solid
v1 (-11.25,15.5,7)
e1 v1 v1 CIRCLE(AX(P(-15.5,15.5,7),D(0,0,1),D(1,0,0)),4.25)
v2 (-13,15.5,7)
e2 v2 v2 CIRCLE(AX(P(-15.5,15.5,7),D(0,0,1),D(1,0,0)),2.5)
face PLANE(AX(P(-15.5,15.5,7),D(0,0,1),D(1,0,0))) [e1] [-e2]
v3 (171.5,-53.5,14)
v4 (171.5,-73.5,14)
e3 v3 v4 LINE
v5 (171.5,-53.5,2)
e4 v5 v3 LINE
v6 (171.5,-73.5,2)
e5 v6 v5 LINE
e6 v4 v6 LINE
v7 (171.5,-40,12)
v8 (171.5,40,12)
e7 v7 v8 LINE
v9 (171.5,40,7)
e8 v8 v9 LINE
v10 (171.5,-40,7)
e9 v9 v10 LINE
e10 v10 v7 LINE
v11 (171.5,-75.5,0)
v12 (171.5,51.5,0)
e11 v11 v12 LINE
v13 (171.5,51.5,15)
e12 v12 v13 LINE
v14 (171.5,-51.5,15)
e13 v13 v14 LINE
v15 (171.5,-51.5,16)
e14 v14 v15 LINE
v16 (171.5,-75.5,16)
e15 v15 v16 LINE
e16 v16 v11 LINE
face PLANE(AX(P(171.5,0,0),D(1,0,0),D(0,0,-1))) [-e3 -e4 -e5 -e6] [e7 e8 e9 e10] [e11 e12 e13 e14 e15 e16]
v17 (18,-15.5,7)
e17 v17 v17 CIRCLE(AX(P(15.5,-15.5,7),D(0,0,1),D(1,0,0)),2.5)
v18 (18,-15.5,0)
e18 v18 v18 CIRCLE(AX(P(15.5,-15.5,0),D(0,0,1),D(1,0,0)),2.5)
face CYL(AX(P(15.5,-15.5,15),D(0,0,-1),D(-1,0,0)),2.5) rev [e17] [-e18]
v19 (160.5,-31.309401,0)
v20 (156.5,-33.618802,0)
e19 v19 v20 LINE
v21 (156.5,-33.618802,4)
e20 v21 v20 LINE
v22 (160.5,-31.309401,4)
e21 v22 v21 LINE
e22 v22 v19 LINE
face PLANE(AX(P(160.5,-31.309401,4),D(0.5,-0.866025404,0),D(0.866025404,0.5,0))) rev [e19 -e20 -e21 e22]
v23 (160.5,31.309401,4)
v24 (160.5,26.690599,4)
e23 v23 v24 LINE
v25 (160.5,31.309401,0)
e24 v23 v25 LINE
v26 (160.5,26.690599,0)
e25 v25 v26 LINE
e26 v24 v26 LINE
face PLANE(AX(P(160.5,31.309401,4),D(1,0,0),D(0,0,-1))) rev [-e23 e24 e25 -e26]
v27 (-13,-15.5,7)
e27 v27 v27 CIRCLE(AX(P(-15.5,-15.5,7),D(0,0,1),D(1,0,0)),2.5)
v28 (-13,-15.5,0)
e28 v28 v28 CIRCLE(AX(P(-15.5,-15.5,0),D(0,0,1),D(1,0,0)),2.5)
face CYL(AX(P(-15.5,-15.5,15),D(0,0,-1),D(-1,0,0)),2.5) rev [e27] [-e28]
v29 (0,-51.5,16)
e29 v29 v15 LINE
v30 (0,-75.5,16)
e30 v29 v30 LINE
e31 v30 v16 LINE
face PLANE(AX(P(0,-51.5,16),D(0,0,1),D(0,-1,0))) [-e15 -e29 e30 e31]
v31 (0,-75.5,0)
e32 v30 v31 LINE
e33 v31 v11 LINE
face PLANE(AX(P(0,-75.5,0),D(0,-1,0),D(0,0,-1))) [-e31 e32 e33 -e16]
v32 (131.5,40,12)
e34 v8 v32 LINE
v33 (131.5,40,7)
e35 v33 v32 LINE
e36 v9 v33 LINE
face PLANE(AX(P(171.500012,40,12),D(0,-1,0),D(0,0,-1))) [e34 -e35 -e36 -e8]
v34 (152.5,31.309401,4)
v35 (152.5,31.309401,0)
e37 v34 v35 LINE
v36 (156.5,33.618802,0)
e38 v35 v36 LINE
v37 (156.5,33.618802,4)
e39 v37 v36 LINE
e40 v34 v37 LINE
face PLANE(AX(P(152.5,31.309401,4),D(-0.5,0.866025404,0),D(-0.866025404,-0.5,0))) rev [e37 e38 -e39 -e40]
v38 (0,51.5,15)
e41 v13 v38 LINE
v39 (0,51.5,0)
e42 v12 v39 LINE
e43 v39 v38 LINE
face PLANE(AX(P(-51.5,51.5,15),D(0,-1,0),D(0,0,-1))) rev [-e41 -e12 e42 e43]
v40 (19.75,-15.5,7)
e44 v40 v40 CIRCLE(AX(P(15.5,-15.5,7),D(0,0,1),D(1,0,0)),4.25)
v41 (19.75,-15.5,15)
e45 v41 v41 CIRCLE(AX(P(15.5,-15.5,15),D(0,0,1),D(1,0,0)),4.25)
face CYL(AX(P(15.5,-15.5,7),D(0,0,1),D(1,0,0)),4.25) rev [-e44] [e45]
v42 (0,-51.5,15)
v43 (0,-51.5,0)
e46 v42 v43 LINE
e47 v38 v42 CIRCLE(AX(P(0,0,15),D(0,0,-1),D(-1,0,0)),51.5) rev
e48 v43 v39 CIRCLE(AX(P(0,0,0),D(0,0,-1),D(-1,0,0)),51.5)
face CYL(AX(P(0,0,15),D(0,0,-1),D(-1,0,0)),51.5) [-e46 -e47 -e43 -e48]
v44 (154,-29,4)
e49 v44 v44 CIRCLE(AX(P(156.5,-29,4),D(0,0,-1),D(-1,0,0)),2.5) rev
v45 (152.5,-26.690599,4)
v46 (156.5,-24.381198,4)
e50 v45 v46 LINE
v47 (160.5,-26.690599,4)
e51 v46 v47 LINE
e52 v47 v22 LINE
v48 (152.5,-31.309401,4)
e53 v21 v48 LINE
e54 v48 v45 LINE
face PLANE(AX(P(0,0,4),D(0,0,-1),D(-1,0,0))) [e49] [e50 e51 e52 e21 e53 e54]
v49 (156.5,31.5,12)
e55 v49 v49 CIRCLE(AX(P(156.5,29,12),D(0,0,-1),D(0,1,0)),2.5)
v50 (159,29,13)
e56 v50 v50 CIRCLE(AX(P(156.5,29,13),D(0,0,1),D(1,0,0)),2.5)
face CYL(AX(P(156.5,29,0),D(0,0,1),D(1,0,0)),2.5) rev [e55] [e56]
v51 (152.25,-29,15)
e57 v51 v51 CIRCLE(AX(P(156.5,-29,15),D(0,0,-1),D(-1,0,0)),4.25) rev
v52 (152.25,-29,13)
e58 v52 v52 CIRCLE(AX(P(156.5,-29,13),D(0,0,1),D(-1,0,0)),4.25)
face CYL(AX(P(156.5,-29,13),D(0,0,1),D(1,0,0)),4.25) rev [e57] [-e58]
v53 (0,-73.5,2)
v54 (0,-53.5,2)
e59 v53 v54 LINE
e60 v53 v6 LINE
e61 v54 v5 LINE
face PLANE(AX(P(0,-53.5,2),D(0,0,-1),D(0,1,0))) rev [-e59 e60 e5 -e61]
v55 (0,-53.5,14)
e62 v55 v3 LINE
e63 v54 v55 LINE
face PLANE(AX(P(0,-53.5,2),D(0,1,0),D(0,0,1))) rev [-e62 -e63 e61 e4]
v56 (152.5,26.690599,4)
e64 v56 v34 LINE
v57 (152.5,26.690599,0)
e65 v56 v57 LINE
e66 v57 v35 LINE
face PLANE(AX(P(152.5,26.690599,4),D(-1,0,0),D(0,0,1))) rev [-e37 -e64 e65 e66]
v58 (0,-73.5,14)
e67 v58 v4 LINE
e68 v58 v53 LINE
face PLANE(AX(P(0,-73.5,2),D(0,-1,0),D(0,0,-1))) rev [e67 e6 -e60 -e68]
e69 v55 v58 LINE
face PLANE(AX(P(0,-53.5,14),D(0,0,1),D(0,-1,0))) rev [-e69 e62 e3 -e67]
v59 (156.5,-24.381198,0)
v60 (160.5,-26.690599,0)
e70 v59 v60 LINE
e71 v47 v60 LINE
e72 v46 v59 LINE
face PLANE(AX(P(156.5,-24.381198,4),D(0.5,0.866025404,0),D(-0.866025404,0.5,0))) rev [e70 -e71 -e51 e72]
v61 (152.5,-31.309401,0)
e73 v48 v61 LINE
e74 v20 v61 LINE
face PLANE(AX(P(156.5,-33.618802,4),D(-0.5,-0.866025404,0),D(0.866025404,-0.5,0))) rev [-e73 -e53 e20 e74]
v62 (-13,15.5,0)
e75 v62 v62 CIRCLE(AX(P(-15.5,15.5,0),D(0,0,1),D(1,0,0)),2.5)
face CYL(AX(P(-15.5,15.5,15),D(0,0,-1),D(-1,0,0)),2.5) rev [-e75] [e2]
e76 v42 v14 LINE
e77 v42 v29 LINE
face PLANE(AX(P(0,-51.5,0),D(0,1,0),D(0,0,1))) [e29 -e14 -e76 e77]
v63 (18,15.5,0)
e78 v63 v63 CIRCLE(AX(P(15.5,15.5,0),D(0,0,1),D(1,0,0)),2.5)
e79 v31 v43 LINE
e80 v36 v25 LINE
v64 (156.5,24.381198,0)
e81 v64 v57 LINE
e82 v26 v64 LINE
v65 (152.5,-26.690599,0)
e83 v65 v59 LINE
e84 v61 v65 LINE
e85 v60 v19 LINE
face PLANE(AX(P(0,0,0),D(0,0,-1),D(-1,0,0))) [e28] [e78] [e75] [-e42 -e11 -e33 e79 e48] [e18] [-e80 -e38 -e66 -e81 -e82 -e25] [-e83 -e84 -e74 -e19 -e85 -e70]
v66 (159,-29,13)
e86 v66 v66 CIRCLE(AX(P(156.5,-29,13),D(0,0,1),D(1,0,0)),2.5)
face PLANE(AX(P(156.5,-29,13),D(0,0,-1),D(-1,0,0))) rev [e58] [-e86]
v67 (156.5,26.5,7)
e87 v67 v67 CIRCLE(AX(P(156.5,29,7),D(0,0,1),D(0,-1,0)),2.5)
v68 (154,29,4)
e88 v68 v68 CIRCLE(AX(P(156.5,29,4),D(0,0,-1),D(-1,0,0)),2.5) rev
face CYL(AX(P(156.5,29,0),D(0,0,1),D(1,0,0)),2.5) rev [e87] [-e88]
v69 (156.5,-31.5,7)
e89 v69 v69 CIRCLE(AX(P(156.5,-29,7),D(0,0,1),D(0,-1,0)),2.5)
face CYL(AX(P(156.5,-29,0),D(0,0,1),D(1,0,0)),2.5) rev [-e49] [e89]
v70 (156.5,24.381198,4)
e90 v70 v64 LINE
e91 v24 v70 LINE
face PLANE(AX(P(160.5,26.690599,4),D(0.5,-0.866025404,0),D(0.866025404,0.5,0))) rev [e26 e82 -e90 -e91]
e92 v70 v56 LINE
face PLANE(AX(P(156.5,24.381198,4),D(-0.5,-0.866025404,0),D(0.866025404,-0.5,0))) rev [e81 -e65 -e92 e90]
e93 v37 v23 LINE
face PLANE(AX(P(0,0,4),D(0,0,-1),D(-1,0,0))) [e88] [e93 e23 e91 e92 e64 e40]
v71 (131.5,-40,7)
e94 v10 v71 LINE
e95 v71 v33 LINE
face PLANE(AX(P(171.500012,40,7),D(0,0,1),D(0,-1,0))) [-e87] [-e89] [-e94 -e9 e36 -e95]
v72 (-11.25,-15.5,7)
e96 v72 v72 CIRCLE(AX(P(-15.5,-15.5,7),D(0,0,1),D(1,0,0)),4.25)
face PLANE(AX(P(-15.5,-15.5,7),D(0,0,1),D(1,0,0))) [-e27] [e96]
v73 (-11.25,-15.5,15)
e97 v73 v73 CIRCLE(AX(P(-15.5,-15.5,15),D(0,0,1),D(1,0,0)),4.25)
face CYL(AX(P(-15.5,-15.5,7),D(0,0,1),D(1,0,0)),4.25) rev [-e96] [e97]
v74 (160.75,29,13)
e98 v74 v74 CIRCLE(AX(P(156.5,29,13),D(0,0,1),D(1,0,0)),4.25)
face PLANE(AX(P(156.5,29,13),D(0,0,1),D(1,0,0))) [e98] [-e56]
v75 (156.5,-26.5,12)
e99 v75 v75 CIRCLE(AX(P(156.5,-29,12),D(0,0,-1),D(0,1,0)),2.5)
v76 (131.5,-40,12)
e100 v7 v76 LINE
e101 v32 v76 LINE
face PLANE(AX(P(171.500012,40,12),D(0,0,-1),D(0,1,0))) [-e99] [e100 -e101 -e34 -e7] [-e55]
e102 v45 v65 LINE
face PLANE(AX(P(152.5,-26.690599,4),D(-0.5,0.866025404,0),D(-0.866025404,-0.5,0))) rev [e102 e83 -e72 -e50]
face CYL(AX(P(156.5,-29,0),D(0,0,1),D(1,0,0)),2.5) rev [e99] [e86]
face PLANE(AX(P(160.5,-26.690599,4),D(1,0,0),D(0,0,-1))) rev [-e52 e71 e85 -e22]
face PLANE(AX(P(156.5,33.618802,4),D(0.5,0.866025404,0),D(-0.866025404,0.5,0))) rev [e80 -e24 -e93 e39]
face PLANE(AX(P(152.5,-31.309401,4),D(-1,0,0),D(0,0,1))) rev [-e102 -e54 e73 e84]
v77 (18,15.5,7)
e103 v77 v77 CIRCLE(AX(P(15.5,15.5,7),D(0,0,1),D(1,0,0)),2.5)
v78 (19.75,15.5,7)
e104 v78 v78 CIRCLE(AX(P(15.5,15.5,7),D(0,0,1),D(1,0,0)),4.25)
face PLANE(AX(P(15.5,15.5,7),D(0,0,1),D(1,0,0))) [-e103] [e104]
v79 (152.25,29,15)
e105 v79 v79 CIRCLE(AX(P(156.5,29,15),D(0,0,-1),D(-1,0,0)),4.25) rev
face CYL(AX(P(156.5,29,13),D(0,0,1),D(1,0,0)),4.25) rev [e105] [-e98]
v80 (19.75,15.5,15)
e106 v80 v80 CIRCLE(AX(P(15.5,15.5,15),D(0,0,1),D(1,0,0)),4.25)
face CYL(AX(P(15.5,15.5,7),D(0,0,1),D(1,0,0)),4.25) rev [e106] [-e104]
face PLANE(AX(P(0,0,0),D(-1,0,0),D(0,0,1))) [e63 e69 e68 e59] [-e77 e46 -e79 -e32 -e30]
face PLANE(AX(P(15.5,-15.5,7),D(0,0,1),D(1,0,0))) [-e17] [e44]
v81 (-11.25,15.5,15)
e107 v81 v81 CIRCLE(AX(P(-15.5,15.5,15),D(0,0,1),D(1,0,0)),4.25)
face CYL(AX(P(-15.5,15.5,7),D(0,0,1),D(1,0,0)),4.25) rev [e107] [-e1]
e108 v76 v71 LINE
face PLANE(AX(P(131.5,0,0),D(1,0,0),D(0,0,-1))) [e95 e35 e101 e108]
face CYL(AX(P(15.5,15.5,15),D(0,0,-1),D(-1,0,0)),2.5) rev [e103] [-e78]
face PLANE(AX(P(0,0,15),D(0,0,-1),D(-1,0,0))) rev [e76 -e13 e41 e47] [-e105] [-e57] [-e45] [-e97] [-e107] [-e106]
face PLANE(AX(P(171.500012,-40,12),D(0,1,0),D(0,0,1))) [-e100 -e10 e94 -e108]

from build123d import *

# Parameters (mm, degrees)
CROQUIS1_W                        = 103
CROQUIS1_H                        = 103
CROQUIS1_R                        = 2.5
SALIENTE_EXTRUIR1_DEPTH           = 15
REDONDEO2_R                       = 51.5
CROQUIS2_W                        = 15
CROQUIS2_H                        = 103
SALIENTE_EXTRUIR2_DEPTH           = 120
CROQUIS3_R                        = 4.25
CORTAR_EXTRUIR1_DEPTH             = 8
SALIENTE_EXTRUIR3_START           = -223
SALIENTE_EXTRUIR3_DEPTH           = 223
CORTAR_EXTRUIR2_DEPTH             = 181.53669987
CORTAR_EXTRUIR2_DEPTH_BACK        = 181.53669987
REDONDEO3_START                   = -23.965772234
REDONDEO3_DEPTH                   = 195.465772234
REDONDEO3_START_2                 = -45.024993159
REDONDEO3_2_DEPTH                 = 21.059220925
REDONDEO3_START_3                 = 15
REDONDEO3_3_DEPTH                 = 9
REDONDEO4_R                       = 10
CORTAR_EXTRUIR3_REACH             = 182.537
CROQUIS6_R                        = 4.25
CORTAR_EXTRUIR3_DIRECTION_2_DEPTH = 181.536699978
CORTAR_EXTRUIR4_DEPTH             = 231.022281636
CORTAR_EXTRUIR4_DEPTH_BACK        = 40
CROQUIS7_W                        = 5
CROQUIS7_H                        = 80
CROQUIS10_R                       = 4.25
CORTAR_EXTRUIR5_DEPTH             = 10
CROQUIS11_R                       = 2.5
CORTAR_EXTRUIR6_DEPTH             = 180.536904387
CROQUIS12_W                       = 16
CROQUIS12_H                       = 24
CROQUIS12_W_2                     = 12
CROQUIS12_H_2                     = 20
SALIENTE_EXTRUIR4_DEPTH           = 171.5
CORTAR_EXTRUIR7_DEPTH             = 4
CROQUIS14_W                       = 242.583484446
CROQUIS14_H                       = 103.867159029
CORTAR_EXTRUIR8_DEPTH             = 8


with BuildPart() as part:
    # Croquis1 → Saliente-Extruir1 (new body)
    with BuildSketch(Plane.XY):
        Rectangle(CROQUIS1_W, CROQUIS1_H)
        with Locations((15.5, 15.5)):
            Circle(CROQUIS1_R, mode=Mode.SUBTRACT)
        with Locations((-15.5, 15.5)):
            Circle(CROQUIS1_R, mode=Mode.SUBTRACT)
        with Locations((-15.5, -15.5)):
            Circle(CROQUIS1_R, mode=Mode.SUBTRACT)
        with Locations((15.5, -15.5)):
            Circle(CROQUIS1_R, mode=Mode.SUBTRACT)
    extrude(amount=SALIENTE_EXTRUIR1_DEPTH)

    # Redondeo2
    redondeo2_edges = [part.edges().sort_by_distance(p)[0] for p in [
        (-51.5, -51.5, 7.5),
        (-51.5, 51.5, 7.5),
    ]]
    fillet(redondeo2_edges, radius=REDONDEO2_R - 0.0001)  # a hair under: the kernel refuses the full size

    # Croquis2 → Saliente-Extruir2 (add)
    with BuildSketch(Plane(origin=(51.5, 0, 0), x_dir=(0, 0, -1), z_dir=(1, 0, 0))):
        with Locations((-7.5, 0)):
            Rectangle(CROQUIS2_W, CROQUIS2_H)
    extrude(amount=SALIENTE_EXTRUIR2_DEPTH)

    # Croquis3 → Cortar-Extruir1 (cut)
    with BuildSketch(Plane.XY.offset(15)):
        with Locations((-15.5, 15.5)):
            Circle(CROQUIS3_R)
        with Locations((15.5, 15.5)):
            Circle(CROQUIS3_R)
        with Locations((15.5, -15.5)):
            Circle(CROQUIS3_R)
        with Locations((-15.5, -15.5)):
            Circle(CROQUIS3_R)
    extrude(amount=-CORTAR_EXTRUIR1_DEPTH, mode=Mode.SUBTRACT)

    # Croquis4 → Saliente-Extruir3 (add)
    with BuildSketch(Plane(origin=(171.5, 0, 0), x_dir=(0, 0, -1), z_dir=(1, 0, 0)).offset(SALIENTE_EXTRUIR3_START)):
        Polygon((-15, -19), (-15, -25), (-23, -25), (-23, 25), (-15, 25), (-15, 19), (-19, 19), (-19, -19), align=None)
    extrude(amount=SALIENTE_EXTRUIR3_DEPTH)

    # Croquis5 → Cortar-Extruir2 (cut, two sides: drawn at the far end of the back side and taken through both)
    with BuildSketch(Plane(origin=(0, 0, 0), x_dir=(-1, 0, 0), z_dir=(0, 0, -1)).offset(-CORTAR_EXTRUIR2_DEPTH_BACK)):
        with BuildLine():
            Line((40.930864284, 31.255629077), (61.422564692, 30.315306135))
            Line((61.422564692, 30.315306135), (63.075048064, -35.056936027))
            Line((63.075048064, -35.056936027), (38.432028807, -34.281615507))
            ThreePointArc((38.432028807, -34.281615507), (48.122237498, -18.343943366), (51.5, 0))
            ThreePointArc((51.5, 0), (48.786214808, 16.497128377), (40.930864284, 31.255629077))
        make_face()
    extrude(amount=CORTAR_EXTRUIR2_DEPTH + CORTAR_EXTRUIR2_DEPTH_BACK, mode=Mode.SUBTRACT)

    # Redondeo3: read off the stored shape, not the designer's step
    # Redondeo3 outline → Redondeo3 (add)
    with BuildSketch(Plane.YZ.offset(REDONDEO3_START)):
        with BuildLine():
            Line((-25, 15), (-25, 23))
            ThreePointArc((-25, 23), (-28.473403651, 17.254033308), (-34.797958971, 15))
            Line((-34.797958971, 15), (-25, 15))
        make_face()
        with BuildLine():
            ThreePointArc((34.797958971, 15), (28.473403651, 17.254033308), (25, 23))
            Line((25, 23), (25, 15))
            Line((25, 15), (34.797958971, 15))
        make_face()
    extrude(amount=REDONDEO3_DEPTH)

    # Redondeo3 2 outline → Redondeo3 2 (add)
    with BuildSketch(Plane.YZ.offset(REDONDEO3_START_2)):
        with BuildLine():
            ThreePointArc((34.797958971, 15), (28.473403651, 17.254033308), (25, 23))
            Line((25, 23), (25, 15))
            Line((25, 15), (34.797958971, 15))
        make_face()
        with BuildLine():
            Line((-25, 15), (-25, 23))
            ThreePointArc((-25, 23), (-28.473403651, 17.254033308), (-34.797958971, 15))
            Line((-34.797958971, 15), (-25, 15))
        make_face()
    extrude(amount=REDONDEO3_2_DEPTH)

    # Redondeo3 3 outline → Redondeo3 3 (cut)
    with BuildSketch(Plane.XY.offset(REDONDEO3_START_3)):
        with BuildLine():
            Line((-45.024993159, -36), (-36.827299657, -36))
            ThreePointArc((-36.827299657, -36), (-41.294060795, -30.774186311), (-45.024993083, -24.999999958))
            Line((-45.024993083, -24.999999958), (-45.024993159, -36))
        make_face()
        with BuildLine():
            Line((-45.024993159, 36), (-45.024993083, 24.999999958))
            ThreePointArc((-45.024993083, 24.999999958), (-41.294060795, 30.774186311), (-36.827299657, 36))
            Line((-36.827299657, 36), (-45.024993159, 36))
        make_face()
    extrude(amount=REDONDEO3_3_DEPTH, mode=Mode.SUBTRACT)

    # Redondeo4
    redondeo4_edges = [part.edges().sort_by_distance(p)[0] for p in [
        (63.237503445, -25, 23),
        (63.237503445, 25, 23),
    ]]
    fillet(redondeo4_edges, radius=REDONDEO4_R)

    # Croquis6 → Cortar-Extruir3 (cut, up to next)
    with BuildSketch(Plane.XY.offset(23), mode=Mode.PRIVATE) as cortar_extruir3_sk1:
        with Locations((15.5, 15.5)):
            Circle(CROQUIS6_R)
    cortar_extruir3_tool1 = extrude(cortar_extruir3_sk1.sketch, amount=-CORTAR_EXTRUIR3_REACH, mode=Mode.PRIVATE) & part.part
    # Croquis6 → Cortar-Extruir3 (cut, up to next)
    with BuildSketch(Plane.XY.offset(23), mode=Mode.PRIVATE) as cortar_extruir3_sk2:
        with Locations((-15.5, 15.5)):
            Circle(CROQUIS6_R)
    cortar_extruir3_tool2 = extrude(cortar_extruir3_sk2.sketch, amount=-CORTAR_EXTRUIR3_REACH, mode=Mode.PRIVATE) & part.part
    # Croquis6 → Cortar-Extruir3 (cut, up to next)
    with BuildSketch(Plane.XY.offset(23), mode=Mode.PRIVATE) as cortar_extruir3_sk3:
        with Locations((15.5, -15.5)):
            Circle(CROQUIS6_R)
    cortar_extruir3_tool3 = extrude(cortar_extruir3_sk3.sketch, amount=-CORTAR_EXTRUIR3_REACH, mode=Mode.PRIVATE) & part.part
    # Croquis6 → Cortar-Extruir3 (cut, up to next)
    with BuildSketch(Plane.XY.offset(23), mode=Mode.PRIVATE) as cortar_extruir3_sk4:
        with Locations((-15.5, -15.5)):
            Circle(CROQUIS6_R)
    cortar_extruir3_tool4 = extrude(cortar_extruir3_sk4.sketch, amount=-CORTAR_EXTRUIR3_REACH, mode=Mode.PRIVATE) & part.part
    add(cortar_extruir3_tool1.solids().sort_by_distance((15.5, 15.5, 23))[0], mode=Mode.SUBTRACT)
    add(cortar_extruir3_tool2.solids().sort_by_distance((-15.5, 15.5, 23))[0], mode=Mode.SUBTRACT)
    add(cortar_extruir3_tool3.solids().sort_by_distance((15.5, -15.5, 23))[0], mode=Mode.SUBTRACT)
    add(cortar_extruir3_tool4.solids().sort_by_distance((-15.5, -15.5, 23))[0], mode=Mode.SUBTRACT)

    # Croquis6 → Cortar-Extruir3 direction 2 (cut)
    with BuildSketch(Plane.XY.offset(23)):
        with Locations((15.5, 15.5)):
            Circle(CROQUIS6_R)
        with Locations((-15.5, 15.5)):
            Circle(CROQUIS6_R)
        with Locations((15.5, -15.5)):
            Circle(CROQUIS6_R)
        with Locations((-15.5, -15.5)):
            Circle(CROQUIS6_R)
    extrude(amount=CORTAR_EXTRUIR3_DIRECTION_2_DEPTH, mode=Mode.SUBTRACT)

    # Croquis7 → Cortar-Extruir4 (cut, two sides: drawn at the far end of the back side and taken through both)
    with BuildSketch(Plane(origin=(171.5, 0, 0), x_dir=(0, 0, -1), z_dir=(1, 0, 0)).offset(-CORTAR_EXTRUIR4_DEPTH_BACK)):
        with Locations((-9.5, 0)):
            Rectangle(CROQUIS7_W, CROQUIS7_H)
    extrude(amount=CORTAR_EXTRUIR4_DEPTH + CORTAR_EXTRUIR4_DEPTH_BACK, mode=Mode.SUBTRACT)

    # Croquis10 → Cortar-Extruir5 (cut)
    with BuildSketch(Plane.XY.offset(23)):
        with Locations((156.5, 29)):
            Circle(CROQUIS10_R)
        with Locations(Location((156.5, -29, 0), (0, 0, 31.206732466))):
            Circle(CROQUIS10_R)
    extrude(amount=-CORTAR_EXTRUIR5_DEPTH, mode=Mode.SUBTRACT)

    # Croquis11 → Cortar-Extruir6 (cut, through all)
    with BuildSketch(Plane.XY.offset(13)):
        with Locations((156.5, 29)):
            Circle(CROQUIS11_R)
        with Locations((156.5, -29)):
            Circle(CROQUIS11_R)
    extrude(amount=-CORTAR_EXTRUIR6_DEPTH, mode=Mode.SUBTRACT)

    # Croquis12 → Saliente-Extruir4 (add)
    with BuildSketch(Plane(origin=(171.5, 0, 0), x_dir=(0, 0, -1), z_dir=(1, 0, 0))):
        with Locations((-8, -63.5)):
            Rectangle(CROQUIS12_W, CROQUIS12_H)
        with Locations((-8, -63.5)):
            Rectangle(CROQUIS12_W_2, CROQUIS12_H_2, mode=Mode.SUBTRACT)
    extrude(amount=-SALIENTE_EXTRUIR4_DEPTH)

    # Croquis13 → Cortar-Extruir7 (cut)
    with BuildSketch(Plane(origin=(0, 0, 0), x_dir=(-1, 0, 0), z_dir=(0, 0, -1))):
        Polygon((-156.5, 24.381197846), (-152.5, 26.690598923), (-152.5, 31.309401077), (-156.5, 33.618802154), (-160.5, 31.309401077), (-160.5, 26.690598923), align=None)
        Polygon((-152.5, -26.690598923), (-156.5, -24.381197846), (-160.5, -26.690598923), (-160.5, -31.309401077), (-156.5, -33.618802154), (-152.5, -31.309401077), align=None)
    extrude(amount=-CORTAR_EXTRUIR7_DEPTH, mode=Mode.SUBTRACT)

    # Croquis14 → Cortar-Extruir8 (cut)
    with BuildSketch(Plane.XY.offset(23)):
        with Locations((50.208257777, 0.433579514)):
            Rectangle(CROQUIS14_W, CROQUIS14_H)
    extrude(amount=-CORTAR_EXTRUIR8_DEPTH, mode=Mode.SUBTRACT)


solid = part.part
